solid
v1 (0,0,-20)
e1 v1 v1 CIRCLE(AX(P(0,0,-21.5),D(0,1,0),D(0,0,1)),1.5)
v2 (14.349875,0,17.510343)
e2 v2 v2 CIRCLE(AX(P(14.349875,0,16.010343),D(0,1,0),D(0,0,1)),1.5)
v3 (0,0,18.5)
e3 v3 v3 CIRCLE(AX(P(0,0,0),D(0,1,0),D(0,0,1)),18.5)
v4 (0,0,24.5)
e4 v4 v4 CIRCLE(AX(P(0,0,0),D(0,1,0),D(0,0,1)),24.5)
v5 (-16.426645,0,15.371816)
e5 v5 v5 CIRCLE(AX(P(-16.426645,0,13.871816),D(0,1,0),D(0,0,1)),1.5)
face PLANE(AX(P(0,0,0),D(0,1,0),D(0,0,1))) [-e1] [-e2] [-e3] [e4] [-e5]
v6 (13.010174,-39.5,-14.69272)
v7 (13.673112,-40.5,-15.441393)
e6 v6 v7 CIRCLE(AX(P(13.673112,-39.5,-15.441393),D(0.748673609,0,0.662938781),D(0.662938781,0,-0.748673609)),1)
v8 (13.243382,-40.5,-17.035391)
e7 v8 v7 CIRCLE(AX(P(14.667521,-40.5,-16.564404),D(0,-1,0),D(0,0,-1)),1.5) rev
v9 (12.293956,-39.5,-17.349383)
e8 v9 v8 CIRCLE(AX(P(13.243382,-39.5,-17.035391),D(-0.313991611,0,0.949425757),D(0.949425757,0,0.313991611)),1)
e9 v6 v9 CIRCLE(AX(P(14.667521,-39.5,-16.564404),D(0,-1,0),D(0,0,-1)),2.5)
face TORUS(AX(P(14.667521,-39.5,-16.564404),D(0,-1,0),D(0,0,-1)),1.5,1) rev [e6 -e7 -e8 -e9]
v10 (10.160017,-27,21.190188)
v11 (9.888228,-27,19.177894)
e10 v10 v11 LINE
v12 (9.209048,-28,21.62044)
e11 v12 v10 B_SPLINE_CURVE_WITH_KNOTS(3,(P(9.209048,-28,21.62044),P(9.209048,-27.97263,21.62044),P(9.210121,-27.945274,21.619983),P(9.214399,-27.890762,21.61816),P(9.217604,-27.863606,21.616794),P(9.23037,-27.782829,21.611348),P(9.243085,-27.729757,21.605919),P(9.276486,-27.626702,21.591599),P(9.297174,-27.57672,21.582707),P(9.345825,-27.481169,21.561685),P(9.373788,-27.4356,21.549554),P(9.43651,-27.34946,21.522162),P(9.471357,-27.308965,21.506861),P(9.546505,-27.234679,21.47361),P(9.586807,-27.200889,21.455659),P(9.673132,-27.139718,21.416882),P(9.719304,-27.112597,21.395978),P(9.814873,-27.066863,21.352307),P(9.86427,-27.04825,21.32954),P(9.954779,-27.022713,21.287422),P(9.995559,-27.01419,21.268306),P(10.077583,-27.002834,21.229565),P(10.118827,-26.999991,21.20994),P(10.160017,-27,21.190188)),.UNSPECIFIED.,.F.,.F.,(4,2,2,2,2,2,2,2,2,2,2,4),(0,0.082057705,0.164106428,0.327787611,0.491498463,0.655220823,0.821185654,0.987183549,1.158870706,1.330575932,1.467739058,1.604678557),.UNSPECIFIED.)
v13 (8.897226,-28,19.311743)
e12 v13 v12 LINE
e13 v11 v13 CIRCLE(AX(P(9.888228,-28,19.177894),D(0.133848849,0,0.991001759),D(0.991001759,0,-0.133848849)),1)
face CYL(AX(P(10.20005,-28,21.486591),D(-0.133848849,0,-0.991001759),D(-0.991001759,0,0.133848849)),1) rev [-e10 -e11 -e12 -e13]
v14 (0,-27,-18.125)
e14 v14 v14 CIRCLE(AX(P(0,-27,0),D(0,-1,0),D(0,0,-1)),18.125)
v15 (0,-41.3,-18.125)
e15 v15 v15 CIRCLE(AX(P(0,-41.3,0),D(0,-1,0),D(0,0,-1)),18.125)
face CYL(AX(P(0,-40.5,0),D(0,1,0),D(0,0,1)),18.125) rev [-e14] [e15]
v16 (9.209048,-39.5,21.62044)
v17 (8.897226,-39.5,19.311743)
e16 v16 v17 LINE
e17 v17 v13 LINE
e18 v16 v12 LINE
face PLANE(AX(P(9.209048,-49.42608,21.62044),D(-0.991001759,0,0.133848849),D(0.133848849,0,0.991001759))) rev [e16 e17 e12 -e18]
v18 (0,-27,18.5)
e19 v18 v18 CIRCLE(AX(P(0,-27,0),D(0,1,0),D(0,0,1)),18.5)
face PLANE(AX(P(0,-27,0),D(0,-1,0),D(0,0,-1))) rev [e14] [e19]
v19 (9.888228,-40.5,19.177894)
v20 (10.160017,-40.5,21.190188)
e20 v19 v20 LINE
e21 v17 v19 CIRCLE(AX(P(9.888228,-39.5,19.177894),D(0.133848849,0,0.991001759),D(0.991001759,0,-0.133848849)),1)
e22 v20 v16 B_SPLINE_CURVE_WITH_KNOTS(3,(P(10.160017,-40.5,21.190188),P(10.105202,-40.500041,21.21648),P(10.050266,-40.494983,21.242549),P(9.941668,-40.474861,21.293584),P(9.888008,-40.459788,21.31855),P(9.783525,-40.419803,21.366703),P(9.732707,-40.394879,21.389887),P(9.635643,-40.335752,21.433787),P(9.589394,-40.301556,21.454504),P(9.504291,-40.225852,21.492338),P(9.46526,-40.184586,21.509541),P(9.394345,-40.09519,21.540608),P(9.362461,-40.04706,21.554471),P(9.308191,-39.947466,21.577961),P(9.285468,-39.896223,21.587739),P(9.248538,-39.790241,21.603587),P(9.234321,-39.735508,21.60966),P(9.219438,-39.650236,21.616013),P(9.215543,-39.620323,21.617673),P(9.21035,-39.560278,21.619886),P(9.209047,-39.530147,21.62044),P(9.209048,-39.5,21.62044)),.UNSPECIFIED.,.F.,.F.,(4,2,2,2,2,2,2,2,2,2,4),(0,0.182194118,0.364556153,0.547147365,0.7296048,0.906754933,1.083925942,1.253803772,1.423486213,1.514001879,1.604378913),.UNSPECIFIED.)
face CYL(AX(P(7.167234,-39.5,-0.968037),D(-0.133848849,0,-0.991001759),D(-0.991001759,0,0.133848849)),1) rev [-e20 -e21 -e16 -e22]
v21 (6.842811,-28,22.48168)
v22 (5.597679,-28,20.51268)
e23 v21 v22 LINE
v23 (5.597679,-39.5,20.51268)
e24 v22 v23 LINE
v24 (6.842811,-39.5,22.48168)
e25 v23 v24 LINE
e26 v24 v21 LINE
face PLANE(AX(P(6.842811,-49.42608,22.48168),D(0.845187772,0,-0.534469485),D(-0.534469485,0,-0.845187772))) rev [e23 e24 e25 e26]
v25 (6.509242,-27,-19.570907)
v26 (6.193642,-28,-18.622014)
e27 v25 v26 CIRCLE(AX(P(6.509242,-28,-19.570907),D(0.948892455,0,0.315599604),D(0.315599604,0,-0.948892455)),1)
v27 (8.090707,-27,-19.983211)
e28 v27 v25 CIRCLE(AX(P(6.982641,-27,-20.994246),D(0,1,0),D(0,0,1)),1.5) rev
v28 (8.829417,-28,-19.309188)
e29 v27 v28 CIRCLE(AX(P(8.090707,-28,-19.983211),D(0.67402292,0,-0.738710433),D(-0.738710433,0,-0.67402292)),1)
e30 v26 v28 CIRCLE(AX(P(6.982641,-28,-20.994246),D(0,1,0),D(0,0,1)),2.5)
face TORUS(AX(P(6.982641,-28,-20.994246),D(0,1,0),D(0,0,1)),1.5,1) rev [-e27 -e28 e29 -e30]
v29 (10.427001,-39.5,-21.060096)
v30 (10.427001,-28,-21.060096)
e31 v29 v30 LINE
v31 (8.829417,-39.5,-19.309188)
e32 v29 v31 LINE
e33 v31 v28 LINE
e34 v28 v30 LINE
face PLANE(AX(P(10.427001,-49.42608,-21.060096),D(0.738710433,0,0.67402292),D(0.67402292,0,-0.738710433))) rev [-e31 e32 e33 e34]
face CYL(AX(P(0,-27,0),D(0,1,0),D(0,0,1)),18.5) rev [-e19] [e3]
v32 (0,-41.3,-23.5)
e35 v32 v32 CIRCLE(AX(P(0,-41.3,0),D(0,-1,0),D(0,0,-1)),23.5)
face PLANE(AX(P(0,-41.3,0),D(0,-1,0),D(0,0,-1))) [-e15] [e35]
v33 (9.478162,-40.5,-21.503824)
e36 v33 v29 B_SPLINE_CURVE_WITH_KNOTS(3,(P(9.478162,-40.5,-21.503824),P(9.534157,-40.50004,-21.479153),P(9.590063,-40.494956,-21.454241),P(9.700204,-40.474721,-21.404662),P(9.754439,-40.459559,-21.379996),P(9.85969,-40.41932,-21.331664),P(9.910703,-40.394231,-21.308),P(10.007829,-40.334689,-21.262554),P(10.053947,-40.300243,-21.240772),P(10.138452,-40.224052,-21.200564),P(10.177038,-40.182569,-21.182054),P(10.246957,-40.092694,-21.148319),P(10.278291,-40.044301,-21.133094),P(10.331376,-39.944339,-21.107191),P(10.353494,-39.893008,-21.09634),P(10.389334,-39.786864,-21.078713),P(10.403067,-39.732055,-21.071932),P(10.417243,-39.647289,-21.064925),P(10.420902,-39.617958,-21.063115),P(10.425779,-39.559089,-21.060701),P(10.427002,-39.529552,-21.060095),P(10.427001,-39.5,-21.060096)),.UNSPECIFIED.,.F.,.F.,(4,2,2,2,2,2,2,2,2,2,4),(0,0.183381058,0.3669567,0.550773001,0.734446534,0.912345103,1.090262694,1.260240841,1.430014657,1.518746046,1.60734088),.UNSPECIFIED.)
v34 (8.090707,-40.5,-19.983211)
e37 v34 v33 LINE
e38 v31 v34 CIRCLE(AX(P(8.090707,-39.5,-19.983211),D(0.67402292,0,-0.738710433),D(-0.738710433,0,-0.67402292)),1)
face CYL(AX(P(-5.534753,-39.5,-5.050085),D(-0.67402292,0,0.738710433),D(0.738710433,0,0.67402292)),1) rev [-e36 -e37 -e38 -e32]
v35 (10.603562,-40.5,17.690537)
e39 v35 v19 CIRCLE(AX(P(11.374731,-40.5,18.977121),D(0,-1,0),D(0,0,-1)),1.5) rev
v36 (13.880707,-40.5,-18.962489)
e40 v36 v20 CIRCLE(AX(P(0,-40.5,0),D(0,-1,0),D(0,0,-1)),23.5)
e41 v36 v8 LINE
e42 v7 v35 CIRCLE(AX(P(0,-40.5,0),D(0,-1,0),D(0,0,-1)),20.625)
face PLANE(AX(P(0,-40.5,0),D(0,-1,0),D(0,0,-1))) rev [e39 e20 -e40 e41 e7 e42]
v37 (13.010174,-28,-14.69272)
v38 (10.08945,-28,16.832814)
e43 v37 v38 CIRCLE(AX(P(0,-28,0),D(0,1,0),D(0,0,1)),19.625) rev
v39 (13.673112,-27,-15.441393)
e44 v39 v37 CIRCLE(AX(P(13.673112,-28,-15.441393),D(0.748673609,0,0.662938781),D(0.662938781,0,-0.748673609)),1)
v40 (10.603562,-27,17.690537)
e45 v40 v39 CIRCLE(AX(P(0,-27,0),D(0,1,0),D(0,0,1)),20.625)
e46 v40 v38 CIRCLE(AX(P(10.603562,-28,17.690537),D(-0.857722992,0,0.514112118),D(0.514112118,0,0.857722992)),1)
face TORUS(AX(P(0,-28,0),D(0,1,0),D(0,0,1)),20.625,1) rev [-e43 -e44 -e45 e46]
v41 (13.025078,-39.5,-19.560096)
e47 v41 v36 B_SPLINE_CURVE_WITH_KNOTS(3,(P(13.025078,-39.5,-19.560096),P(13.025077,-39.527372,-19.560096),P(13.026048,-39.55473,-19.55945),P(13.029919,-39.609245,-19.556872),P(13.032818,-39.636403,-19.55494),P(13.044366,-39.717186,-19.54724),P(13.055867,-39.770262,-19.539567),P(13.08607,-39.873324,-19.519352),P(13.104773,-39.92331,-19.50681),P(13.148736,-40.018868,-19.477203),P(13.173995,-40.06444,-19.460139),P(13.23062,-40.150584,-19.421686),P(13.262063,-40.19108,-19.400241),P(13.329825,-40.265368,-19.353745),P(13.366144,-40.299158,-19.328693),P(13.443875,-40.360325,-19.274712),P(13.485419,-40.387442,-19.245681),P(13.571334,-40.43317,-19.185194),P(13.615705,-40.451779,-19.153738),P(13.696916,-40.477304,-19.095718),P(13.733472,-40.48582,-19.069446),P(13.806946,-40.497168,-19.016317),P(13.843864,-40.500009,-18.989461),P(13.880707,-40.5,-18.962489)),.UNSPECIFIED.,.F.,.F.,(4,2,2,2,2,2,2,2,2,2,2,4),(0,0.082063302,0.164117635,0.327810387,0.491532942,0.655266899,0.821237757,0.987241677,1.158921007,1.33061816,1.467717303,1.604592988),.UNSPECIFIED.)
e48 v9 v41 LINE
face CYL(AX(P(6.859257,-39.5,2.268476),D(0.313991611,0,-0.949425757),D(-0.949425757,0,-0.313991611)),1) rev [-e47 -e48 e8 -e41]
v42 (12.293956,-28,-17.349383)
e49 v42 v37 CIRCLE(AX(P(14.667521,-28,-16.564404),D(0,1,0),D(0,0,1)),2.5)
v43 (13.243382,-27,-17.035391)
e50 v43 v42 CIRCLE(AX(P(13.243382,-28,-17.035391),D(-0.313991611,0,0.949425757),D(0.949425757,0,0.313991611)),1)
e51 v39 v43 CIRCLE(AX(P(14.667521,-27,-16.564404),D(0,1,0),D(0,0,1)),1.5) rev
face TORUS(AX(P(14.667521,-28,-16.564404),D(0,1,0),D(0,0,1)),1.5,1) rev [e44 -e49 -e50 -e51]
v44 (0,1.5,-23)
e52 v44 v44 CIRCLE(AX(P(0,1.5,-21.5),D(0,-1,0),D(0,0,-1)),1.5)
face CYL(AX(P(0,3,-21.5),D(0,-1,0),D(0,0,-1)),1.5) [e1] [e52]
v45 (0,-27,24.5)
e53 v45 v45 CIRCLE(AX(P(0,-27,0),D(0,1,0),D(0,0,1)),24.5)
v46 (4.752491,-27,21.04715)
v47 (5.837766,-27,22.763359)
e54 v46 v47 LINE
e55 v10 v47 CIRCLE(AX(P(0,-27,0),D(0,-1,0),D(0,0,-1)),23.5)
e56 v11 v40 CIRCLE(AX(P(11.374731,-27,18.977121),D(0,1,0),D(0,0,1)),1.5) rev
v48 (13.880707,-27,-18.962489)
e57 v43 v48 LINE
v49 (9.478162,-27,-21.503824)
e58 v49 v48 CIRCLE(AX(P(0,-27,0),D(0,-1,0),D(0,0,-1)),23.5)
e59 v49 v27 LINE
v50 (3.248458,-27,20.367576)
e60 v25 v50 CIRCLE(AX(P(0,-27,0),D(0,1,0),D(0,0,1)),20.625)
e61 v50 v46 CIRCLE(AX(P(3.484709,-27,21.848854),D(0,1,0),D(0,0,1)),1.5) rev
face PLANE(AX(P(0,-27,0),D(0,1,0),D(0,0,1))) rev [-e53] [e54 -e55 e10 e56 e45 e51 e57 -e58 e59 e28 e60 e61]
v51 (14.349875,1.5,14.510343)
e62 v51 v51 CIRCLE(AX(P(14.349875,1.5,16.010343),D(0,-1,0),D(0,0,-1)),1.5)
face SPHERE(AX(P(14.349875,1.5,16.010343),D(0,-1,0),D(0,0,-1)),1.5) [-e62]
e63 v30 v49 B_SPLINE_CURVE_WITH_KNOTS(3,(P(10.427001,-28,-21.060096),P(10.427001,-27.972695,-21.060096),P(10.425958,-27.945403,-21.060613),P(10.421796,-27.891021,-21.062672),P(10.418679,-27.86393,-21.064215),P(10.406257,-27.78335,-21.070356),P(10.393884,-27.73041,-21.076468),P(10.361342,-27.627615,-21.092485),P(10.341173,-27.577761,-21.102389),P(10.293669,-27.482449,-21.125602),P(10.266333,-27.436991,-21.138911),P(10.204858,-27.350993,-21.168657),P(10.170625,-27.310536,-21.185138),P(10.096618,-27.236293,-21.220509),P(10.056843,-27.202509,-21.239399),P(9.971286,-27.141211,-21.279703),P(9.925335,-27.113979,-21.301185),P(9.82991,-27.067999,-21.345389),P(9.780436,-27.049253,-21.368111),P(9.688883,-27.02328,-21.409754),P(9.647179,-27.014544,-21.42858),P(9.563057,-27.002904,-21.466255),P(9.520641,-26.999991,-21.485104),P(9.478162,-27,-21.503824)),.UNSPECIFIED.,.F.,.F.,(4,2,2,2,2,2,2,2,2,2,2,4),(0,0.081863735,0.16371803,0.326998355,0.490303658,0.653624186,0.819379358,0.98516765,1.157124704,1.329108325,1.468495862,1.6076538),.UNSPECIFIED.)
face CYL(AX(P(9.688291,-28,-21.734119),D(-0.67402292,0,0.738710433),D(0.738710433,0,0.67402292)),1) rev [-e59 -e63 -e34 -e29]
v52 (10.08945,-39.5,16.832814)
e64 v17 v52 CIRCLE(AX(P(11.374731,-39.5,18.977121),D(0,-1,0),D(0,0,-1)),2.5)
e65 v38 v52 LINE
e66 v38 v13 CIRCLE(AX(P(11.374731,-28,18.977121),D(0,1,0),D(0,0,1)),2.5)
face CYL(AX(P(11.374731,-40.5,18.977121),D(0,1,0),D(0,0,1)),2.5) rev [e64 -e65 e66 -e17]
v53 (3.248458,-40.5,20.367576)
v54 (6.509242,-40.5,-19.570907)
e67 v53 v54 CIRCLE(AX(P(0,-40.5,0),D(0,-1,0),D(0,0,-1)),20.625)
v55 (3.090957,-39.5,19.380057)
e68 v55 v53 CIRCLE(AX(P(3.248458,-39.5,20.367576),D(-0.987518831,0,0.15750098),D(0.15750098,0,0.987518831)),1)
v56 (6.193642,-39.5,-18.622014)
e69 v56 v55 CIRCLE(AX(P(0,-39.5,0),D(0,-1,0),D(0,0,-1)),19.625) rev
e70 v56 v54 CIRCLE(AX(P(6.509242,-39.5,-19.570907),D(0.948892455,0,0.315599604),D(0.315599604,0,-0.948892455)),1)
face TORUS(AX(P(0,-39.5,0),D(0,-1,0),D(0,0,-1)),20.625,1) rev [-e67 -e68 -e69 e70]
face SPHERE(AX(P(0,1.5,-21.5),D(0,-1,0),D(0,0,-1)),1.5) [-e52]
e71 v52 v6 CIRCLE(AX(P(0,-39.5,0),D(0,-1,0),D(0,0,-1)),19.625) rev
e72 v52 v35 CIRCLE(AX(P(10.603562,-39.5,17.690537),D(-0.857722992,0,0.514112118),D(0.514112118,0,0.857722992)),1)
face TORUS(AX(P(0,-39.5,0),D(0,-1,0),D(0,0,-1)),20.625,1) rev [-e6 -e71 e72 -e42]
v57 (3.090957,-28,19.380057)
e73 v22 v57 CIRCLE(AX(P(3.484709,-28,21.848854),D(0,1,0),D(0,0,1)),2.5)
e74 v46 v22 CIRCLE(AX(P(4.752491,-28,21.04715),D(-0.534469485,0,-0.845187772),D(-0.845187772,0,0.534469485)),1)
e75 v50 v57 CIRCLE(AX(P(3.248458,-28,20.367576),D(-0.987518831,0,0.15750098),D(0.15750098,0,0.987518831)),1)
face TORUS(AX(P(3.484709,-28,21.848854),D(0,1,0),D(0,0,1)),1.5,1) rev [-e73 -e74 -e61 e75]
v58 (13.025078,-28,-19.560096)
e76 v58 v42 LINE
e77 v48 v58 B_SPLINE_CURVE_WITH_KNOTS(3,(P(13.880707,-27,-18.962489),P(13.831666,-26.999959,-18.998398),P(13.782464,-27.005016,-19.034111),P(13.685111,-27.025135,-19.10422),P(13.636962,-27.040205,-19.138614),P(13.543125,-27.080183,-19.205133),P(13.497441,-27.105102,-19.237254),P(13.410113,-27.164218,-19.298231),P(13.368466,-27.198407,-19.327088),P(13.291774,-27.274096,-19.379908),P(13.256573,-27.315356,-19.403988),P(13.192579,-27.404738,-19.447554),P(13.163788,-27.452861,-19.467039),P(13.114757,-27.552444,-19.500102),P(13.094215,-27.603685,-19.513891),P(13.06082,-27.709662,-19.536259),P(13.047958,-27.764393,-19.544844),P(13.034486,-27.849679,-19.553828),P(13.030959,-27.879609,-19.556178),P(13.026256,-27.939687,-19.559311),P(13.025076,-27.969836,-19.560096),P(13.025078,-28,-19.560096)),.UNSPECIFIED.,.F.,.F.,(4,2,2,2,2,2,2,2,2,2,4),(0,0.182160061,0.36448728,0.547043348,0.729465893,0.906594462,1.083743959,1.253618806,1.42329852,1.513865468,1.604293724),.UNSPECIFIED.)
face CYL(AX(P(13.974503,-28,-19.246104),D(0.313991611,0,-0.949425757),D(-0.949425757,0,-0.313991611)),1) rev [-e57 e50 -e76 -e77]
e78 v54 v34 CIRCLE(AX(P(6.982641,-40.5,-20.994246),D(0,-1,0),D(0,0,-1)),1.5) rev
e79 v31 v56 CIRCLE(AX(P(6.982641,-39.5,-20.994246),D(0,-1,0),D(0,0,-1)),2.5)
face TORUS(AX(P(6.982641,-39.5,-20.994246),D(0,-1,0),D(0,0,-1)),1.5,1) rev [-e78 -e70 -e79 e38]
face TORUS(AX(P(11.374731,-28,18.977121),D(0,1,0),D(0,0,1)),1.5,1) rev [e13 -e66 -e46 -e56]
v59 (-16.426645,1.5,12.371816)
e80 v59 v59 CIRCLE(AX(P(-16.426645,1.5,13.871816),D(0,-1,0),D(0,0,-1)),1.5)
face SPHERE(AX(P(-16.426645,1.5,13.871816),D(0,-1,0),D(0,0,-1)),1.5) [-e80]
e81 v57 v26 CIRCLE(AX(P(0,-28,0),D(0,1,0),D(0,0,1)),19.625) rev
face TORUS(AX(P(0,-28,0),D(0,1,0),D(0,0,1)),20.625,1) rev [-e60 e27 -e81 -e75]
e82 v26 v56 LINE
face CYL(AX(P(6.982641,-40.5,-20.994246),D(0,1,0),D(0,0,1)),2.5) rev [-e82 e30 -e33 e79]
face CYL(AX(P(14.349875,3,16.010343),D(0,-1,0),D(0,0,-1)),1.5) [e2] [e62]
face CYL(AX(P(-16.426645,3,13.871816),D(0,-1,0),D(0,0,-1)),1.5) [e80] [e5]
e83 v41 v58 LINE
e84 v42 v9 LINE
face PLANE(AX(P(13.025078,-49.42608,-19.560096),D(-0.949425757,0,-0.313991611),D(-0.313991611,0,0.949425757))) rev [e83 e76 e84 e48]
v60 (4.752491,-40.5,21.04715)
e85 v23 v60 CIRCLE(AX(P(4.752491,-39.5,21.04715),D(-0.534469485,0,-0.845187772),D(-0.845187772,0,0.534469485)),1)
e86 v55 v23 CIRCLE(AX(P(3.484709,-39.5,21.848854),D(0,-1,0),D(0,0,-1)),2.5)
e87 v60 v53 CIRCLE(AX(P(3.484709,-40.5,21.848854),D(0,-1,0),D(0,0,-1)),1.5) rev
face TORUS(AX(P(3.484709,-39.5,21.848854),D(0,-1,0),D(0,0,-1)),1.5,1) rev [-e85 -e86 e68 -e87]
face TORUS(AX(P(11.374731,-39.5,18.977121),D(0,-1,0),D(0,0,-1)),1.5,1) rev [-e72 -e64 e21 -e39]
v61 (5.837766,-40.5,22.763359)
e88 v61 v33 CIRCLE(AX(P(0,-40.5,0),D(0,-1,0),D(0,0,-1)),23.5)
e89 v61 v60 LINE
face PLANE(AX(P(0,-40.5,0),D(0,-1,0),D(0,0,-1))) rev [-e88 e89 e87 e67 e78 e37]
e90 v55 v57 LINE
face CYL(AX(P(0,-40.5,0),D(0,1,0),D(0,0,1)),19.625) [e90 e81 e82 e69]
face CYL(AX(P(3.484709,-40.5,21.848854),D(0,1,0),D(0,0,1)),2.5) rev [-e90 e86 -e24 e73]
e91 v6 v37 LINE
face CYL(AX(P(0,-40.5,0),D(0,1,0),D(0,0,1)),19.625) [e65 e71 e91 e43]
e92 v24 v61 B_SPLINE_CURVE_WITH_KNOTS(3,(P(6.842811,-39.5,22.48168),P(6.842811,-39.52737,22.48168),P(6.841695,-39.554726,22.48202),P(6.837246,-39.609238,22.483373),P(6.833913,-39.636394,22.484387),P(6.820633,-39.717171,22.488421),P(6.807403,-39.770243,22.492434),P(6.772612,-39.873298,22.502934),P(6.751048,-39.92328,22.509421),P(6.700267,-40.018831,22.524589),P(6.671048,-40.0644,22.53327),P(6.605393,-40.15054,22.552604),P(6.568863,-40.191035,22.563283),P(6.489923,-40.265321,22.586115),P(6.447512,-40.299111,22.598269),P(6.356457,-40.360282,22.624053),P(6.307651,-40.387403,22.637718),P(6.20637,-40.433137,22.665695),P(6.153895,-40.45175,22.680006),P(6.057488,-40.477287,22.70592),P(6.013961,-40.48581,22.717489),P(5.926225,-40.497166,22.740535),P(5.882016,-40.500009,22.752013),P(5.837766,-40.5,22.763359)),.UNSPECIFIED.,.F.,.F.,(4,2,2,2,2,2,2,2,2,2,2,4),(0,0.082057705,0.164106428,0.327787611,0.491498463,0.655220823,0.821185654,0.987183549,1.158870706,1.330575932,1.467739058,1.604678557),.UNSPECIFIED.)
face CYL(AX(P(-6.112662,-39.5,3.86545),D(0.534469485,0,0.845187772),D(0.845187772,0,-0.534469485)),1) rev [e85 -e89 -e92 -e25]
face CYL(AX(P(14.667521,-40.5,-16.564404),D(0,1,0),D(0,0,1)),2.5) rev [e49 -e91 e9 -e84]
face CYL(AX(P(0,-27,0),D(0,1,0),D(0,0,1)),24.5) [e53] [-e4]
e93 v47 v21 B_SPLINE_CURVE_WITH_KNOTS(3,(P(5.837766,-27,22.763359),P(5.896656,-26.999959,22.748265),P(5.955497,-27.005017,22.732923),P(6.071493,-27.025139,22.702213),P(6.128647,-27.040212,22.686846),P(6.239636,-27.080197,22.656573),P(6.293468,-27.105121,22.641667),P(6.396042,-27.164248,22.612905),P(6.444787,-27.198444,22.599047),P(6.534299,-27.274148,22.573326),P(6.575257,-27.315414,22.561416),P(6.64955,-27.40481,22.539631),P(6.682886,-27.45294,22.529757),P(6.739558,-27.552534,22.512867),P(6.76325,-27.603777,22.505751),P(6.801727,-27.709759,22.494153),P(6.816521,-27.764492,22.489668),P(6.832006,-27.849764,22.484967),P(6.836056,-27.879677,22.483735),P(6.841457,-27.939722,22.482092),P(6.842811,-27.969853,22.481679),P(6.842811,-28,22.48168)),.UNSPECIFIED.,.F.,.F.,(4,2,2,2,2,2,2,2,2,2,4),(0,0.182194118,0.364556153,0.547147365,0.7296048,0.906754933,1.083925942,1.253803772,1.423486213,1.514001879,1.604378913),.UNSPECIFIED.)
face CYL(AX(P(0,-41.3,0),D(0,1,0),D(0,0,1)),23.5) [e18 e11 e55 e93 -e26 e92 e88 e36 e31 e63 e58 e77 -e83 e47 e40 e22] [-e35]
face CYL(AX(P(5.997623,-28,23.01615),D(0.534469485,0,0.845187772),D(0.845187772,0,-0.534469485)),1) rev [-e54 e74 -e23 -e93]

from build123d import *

# Parameters (mm, degrees)
SKETCH1_R            = 24.5
SKETCH1_R_2          = 18.5
BOSS_EXTRUDE1_DEPTH  = 27
SKETCH2_R            = 19.625
SKETCH2_R_2          = 18.125
BOSS_EXTRUDE2_DEPTH  = 13.5
SKETCH4_R            = 23.5
SKETCH4_R_2          = 18.125
BOSS_EXTRUDE3_DEPTH  = 0.8
SKETCH3_R            = 1.5
BOSS_EXTRUDE4_DEPTH  = 3
FILLET1_R            = 1.5
BOSS_EXTRUDE14_DEPTH = 13.5
FILLET3_R            = 2.5
FILLET4_R            = 1


with BuildPart() as part:
    # Sketch1 → Boss-Extrude1 (new body)
    with BuildSketch(Plane(origin=(0, 0, 0), x_dir=(1, 0, 0), z_dir=(0, 1, 0))):
        with Locations(Location((0, 0, 0), (0, 0, 270))):
            Circle(SKETCH1_R)
        with Locations(Location((0, 0, 0), (0, 0, 270))):
            Circle(SKETCH1_R_2, mode=Mode.SUBTRACT)
    extrude(amount=-BOSS_EXTRUDE1_DEPTH)

    # Sketch2 → Boss-Extrude2 (add)
    with BuildSketch(Plane.XZ.offset(27)):
        with Locations(Location((0, 0, 0), (0, 0, 90))):
            Circle(SKETCH2_R)
        with Locations(Location((0, 0, 0), (0, 0, 270))):
            Circle(SKETCH2_R_2, mode=Mode.SUBTRACT)
    extrude(amount=BOSS_EXTRUDE2_DEPTH)

    # Sketch4 → Boss-Extrude3 (add)
    with BuildSketch(Plane.XZ.offset(40.5)):
        with Locations(Location((0, 0, 0), (0, 0, 270))):
            Circle(SKETCH4_R)
        with Locations(Location((0, 0, 0), (0, 0, 270))):
            Circle(SKETCH4_R_2, mode=Mode.SUBTRACT)
    extrude(amount=BOSS_EXTRUDE3_DEPTH)

    # Sketch3 → Boss-Extrude4 (add)
    with BuildSketch(Plane(origin=(0, 0, 0), x_dir=(1, 0, 0), z_dir=(0, 1, 0))):
        with Locations(Location((0, 21.5, 0), (0, 0, 270))):
            Circle(SKETCH3_R)
        with Locations(Location((-16.426644714, -13.871815665, 0), (0, 0, 270))):
            Circle(SKETCH3_R)
        with Locations(Location((14.349874969, -16.010343168, 0), (0, 0, 270))):
            Circle(SKETCH3_R)
    extrude(amount=BOSS_EXTRUDE4_DEPTH)

    # Fillet1
    fillet1_edges = [part.edges().sort_by_distance(p)[0] for p in [
        (0, 3, -23),
        (-16.426644714, 3, 12.371815665),
        (14.349874969, 3, 14.510343168),
    ]]
    fillet(fillet1_edges, radius=FILLET1_R)

    # Sketch6 → Boss-Extrude14 (add)
    with BuildSketch(Plane.XZ.offset(27)):
        with BuildLine():
            Line((10.427001294, -21.060096012), (6.880284611, -17.172992857))
            ThreePointArc((6.880284611, -17.172992857), (9.221324303, -16.03799171), (11.379993428, -14.585806443))
            Line((11.379993428, -14.585806443), (13.025077505, -19.560096012))
            ThreePointArc((13.025077505, -19.560096012), (11.75, -20.351596989), (10.427001294, -21.060096012))
        make_face()
        with BuildLine():
            Line((9.20904846, 21.620440015), (8.507694451, 16.427694151))
            ThreePointArc((8.507694451, 16.427694151), (6.327372652, 17.384313485), (4.042246199, 18.052984398))
            Line((4.042246199, 18.052984398), (6.842810559, 22.481680179))
            ThreePointArc((6.842810559, 22.481680179), (8.037473368, 22.082776588), (9.20904846, 21.620440015))
        make_face()
    extrude(amount=BOSS_EXTRUDE14_DEPTH)

    # Fillet3
    fillet3_edges = [part.edges().sort_by_distance(p)[0] for p in [
        (8.667040078, -33.75, 17.607471178),
        (4.678526421, -33.75, 19.059171428),
        (11.753741984, -33.75, -15.715921048),
        (7.686830622, -33.75, -18.056944924),
    ]]
    fillet(fillet3_edges, radius=FILLET3_R)

    # Fillet4
    # the kernel refuses this fillet: 1 mm, written as the material it adds along each edge
    with BuildSketch(Plane(origin=(5.597678623, -27, 20.512680419), x_dir=(-0.845187772005224, 0, 0.5344694846788222), z_dir=(0.5344694846788222, 0, 0.845187772005224))) as fillet4_piece_1_section:
        with BuildLine():
            CenterArc((FILLET4_R, FILLET4_R), FILLET4_R, 180, 90)
            Line((0, FILLET4_R), (0, 0))
            Line((0, 0), (FILLET4_R, 0))
        make_face()
    fillet4_piece_1 = extrude(amount=4.829659544, mode=Mode.PRIVATE)
    fillet4_piece_1 = fillet4_piece_1 & Plane(origin=(0, -27.229900113, 0), x_dir=(0.29118342802716585, 0, 0.9566672416479768), z_dir=(0, 1, 0)) * Cylinder(23.5, 14, mode=Mode.PRIVATE)
    add(fillet4_piece_1)
    with BuildSketch(Plane(origin=(5.597678623, -40.5, 20.512680419), x_dir=(0, 1, 0), z_dir=(0.5344694846788222, 0, 0.845187772005224))) as fillet4_piece_2_section:
        with BuildLine():
            CenterArc((FILLET4_R, FILLET4_R), FILLET4_R, 180, 90)
            Line((0, FILLET4_R), (0, 0))
            Line((0, 0), (FILLET4_R, 0))
        make_face()
    fillet4_piece_2 = extrude(amount=4.829659544, mode=Mode.PRIVATE)
    fillet4_piece_2 = fillet4_piece_2 & Plane(origin=(0, -40.270099952, 0), x_dir=(0.29118342802716585, 0, 0.9566672416479768), z_dir=(0, 1, 0)) * Cylinder(23.5, 14, mode=Mode.PRIVATE)
    add(fillet4_piece_2)
    with BuildSketch(Plane(origin=(12.293956137, -27, -17.349382624), x_dir=(0.9494257570669186, 0, 0.31399161106295287), z_dir=(0.31399161106295287, 0, -0.9494257570669186))) as fillet4_piece_3_section:
        with BuildLine():
            CenterArc((FILLET4_R, FILLET4_R), FILLET4_R, 180, 90)
            Line((0, FILLET4_R), (0, 0))
            Line((0, 0), (FILLET4_R, 0))
        make_face()
    fillet4_piece_3 = extrude(amount=4.828474208, mode=Mode.PRIVATE)
    fillet4_piece_3 = fillet4_piece_3 & Plane(origin=(0, -27.229897282, 0), x_dir=(0.554258617244049, 0, -0.8323445111314876), z_dir=(0, 1, 0)) * Cylinder(23.5, 14, mode=Mode.PRIVATE)
    add(fillet4_piece_3)
    with BuildSketch(Plane(origin=(12.293956137, -40.5, -17.349382624), x_dir=(0, 1, 0), z_dir=(0.31399161106295287, 0, -0.9494257570669186))) as fillet4_piece_4_section:
        with BuildLine():
            CenterArc((FILLET4_R, FILLET4_R), FILLET4_R, 180, 90)
            Line((0, FILLET4_R), (0, 0))
            Line((0, 0), (FILLET4_R, 0))
        make_face()
    fillet4_piece_4 = extrude(amount=4.828474208, mode=Mode.PRIVATE)
    fillet4_piece_4 = fillet4_piece_4 & Plane(origin=(0, -40.270102709, 0), x_dir=(0.554258617244049, 0, -0.8323445111314876), z_dir=(0, 1, 0)) * Cylinder(23.5, 14, mode=Mode.PRIVATE)
    add(fillet4_piece_4)
    with BuildSketch(Plane(origin=(12.112058593, -40.5, -22.906872094), x_dir=(0, 1, 0), z_dir=(-0.6740229195535309, 0, 0.7387104330632771))) as fillet4_piece_5_section:
        with BuildLine():
            CenterArc((FILLET4_R, FILLET4_R), FILLET4_R, 180, 90)
            Line((0, FILLET4_R), (0, 0))
            Line((0, 0), (FILLET4_R, 0))
        make_face()
    fillet4_piece_5 = extrude(amount=4.870222046, mode=Mode.PRIVATE)
    fillet4_piece_5 = fillet4_piece_5 & Plane(origin=(0, -40.270007691, 0), x_dir=(0.554258617244049, 0, -0.8323445111314876), z_dir=(0, 1, 0)) * Cylinder(23.5, 14, mode=Mode.PRIVATE)
    add(fillet4_piece_5)
    with BuildSketch(Plane(origin=(12.112058593, -27, -22.906872094), x_dir=(-0.7387104330632771, 0, -0.6740229195535309), z_dir=(-0.6740229195535309, 0, 0.7387104330632771))) as fillet4_piece_6_section:
        with BuildLine():
            CenterArc((FILLET4_R, FILLET4_R), FILLET4_R, 180, 90)
            Line((0, FILLET4_R), (0, 0))
            Line((0, 0), (FILLET4_R, 0))
        make_face()
    fillet4_piece_6 = extrude(amount=4.870222046, mode=Mode.PRIVATE)
    fillet4_piece_6 = fillet4_piece_6 & Plane(origin=(0, -27.229992277, 0), x_dir=(0.554258617244049, 0, -0.8323445111314876), z_dir=(0, 1, 0)) * Cylinder(23.5, 14, mode=Mode.PRIVATE)
    add(fillet4_piece_6)
    with BuildSketch(Plane(origin=(0, -27, 0), x_dir=(0.31559960351651706, 0, -0.9488924545280235), z_dir=(0.9488924545280235, 0, 0.31559960351651706))) as fillet4_piece_7:
        with BuildLine():
            CenterArc((19.625 + FILLET4_R, -FILLET4_R), FILLET4_R, 90, 90)
            Line((19.625, -FILLET4_R), (19.625, 0))
            Line((19.625, 0), (19.625 + FILLET4_R, 0))
        make_face()
    revolve(axis=Axis((0, -27, 0), (0, 1, 0)), revolution_arc=207.458888938)
    with BuildSketch(Plane(origin=(9.543670582, -27, 24.097944412), x_dir=(0.9910017586438099, 0, -0.133848848948641), z_dir=(-0.133848848948641, 0, -0.9910017586438098))) as fillet4_piece_8_section:
        with BuildLine():
            CenterArc((FILLET4_R, FILLET4_R), FILLET4_R, 180, 90)
            Line((0, FILLET4_R), (0, 0))
            Line((0, 0), (FILLET4_R, 0))
        make_face()
    fillet4_piece_8 = extrude(amount=4.829659544, mode=Mode.PRIVATE)
    fillet4_piece_8 = fillet4_piece_8 & Plane(origin=(0, -27.229900043, 0), x_dir=(0.29118342802716585, 0, 0.9566672416479768), z_dir=(0, 1, 0)) * Cylinder(23.5, 14, mode=Mode.PRIVATE)
    add(fillet4_piece_8)
    with BuildSketch(Plane(origin=(0, -27, 0), x_dir=(0.6629387810190173, 0, -0.7486736088717295), z_dir=(-0.7486736088717295, 0, -0.6629387810190173))) as fillet4_piece_9:
        with BuildLine():
            CenterArc((19.625 + FILLET4_R, FILLET4_R), FILLET4_R, 180, 90)
            Line((19.625, FILLET4_R), (19.625, 0))
            Line((19.625, 0), (19.625 + FILLET4_R, 0))
        make_face()
    revolve(axis=Axis((0, -27, 0), (0, -1, 0)), revolution_arc=107.537485904)
    with BuildSketch(Plane(origin=(3.484709193, -27, 21.848854131), x_dir=(-0.15750098046494554, 0, -0.9875188307837884), z_dir=(-0.9875188307837884, 0, 0.15750098046494554))) as fillet4_piece_10:
        with BuildLine():
            CenterArc((2.5 - FILLET4_R, FILLET4_R), FILLET4_R, 270, 90)
            Line((2.5, FILLET4_R), (2.5, 0))
            Line((2.5, 0), (2.5 - FILLET4_R, 0))
        make_face()
    revolve(axis=Axis((3.484709193, -27, 21.848854131), (0, -1, 0)), revolution_arc=66.753933518)
    with BuildSketch(Plane(origin=(11.374730608, -27, 18.977121188), x_dir=(-0.514112117888976, 0, -0.8577229915536319), z_dir=(0.8577229915536319, 0, -0.514112117888976))) as fillet4_piece_11:
        with BuildLine():
            CenterArc((2.5 - FILLET4_R, -FILLET4_R), FILLET4_R, 0, 90)
            Line((2.5, -FILLET4_R), (2.5, 0))
            Line((2.5, 0), (2.5 - FILLET4_R, 0))
        make_face()
    revolve(axis=Axis((11.374730608, -27, 18.977121188), (0, 1, 0)), revolution_arc=66.753933518)
    with BuildSketch(Plane(origin=(14.66752053, -27, -16.564403596), x_dir=(-0.6629387810190174, 0, 0.7486736088717294), z_dir=(0.7486736088717294, 0, 0.6629387810190174))) as fillet4_piece_12:
        with BuildLine():
            CenterArc((2.5 - FILLET4_R, FILLET4_R), FILLET4_R, 270, 90)
            Line((2.5, FILLET4_R), (2.5, 0))
            Line((2.5, 0), (2.5 - FILLET4_R, 0))
        make_face()
    revolve(axis=Axis((14.66752053, -27, -16.564403596), (0, -1, 0)), revolution_arc=66.775561076)
    with BuildSketch(Plane(origin=(6.982641228, -27, -20.994245556), x_dir=(0.7387104330632772, 0, 0.6740229195535309), z_dir=(0.6740229195535309, 0, -0.7387104330632772))) as fillet4_piece_13:
        with BuildLine():
            CenterArc((2.5 - FILLET4_R, FILLET4_R), FILLET4_R, 270, 90)
            Line((2.5, FILLET4_R), (2.5, 0))
            Line((2.5, 0), (2.5 - FILLET4_R, 0))
        make_face()
    revolve(axis=Axis((6.982641228, -27, -20.994245556), (0, -1, 0)), revolution_arc=66.01869491)
    with BuildSketch(Plane(origin=(0, -40.5, 0), x_dir=(0.31559960351651706, 0, -0.9488924545280235), z_dir=(0.9488924545280235, 0, 0.31559960351651706))) as fillet4_piece_14:
        with BuildLine():
            CenterArc((19.625 + FILLET4_R, FILLET4_R), FILLET4_R, 180, 90)
            Line((19.625 + FILLET4_R, 0), (19.625, 0))
            Line((19.625, 0), (19.625, FILLET4_R))
        make_face()
    revolve(axis=Axis((0, -40.5, 0), (0, 1, 0)), revolution_arc=207.458888938)
    with BuildSketch(Plane(origin=(3.484709193, -40.5, 21.848854131), x_dir=(-0.15750098046494554, 0, -0.9875188307837884), z_dir=(-0.9875188307837884, 0, 0.15750098046494554))) as fillet4_piece_15:
        with BuildLine():
            CenterArc((2.5 - FILLET4_R, -FILLET4_R), FILLET4_R, 0, 90)
            Line((2.5 - FILLET4_R, 0), (2.5, 0))
            Line((2.5, 0), (2.5, -FILLET4_R))
        make_face()
    revolve(axis=Axis((3.484709193, -40.5, 21.848854131), (0, -1, 0)), revolution_arc=66.753933518)
    with BuildSketch(Plane(origin=(6.982641228, -40.5, -20.994245556), x_dir=(0.7387104330632772, 0, 0.6740229195535309), z_dir=(0.6740229195535309, 0, -0.7387104330632772))) as fillet4_piece_16:
        with BuildLine():
            CenterArc((2.5 - FILLET4_R, -FILLET4_R), FILLET4_R, 0, 90)
            Line((2.5 - FILLET4_R, 0), (2.5, 0))
            Line((2.5, 0), (2.5, -FILLET4_R))
        make_face()
    revolve(axis=Axis((6.982641228, -40.5, -20.994245556), (0, -1, 0)), revolution_arc=66.01869491)
    with BuildSketch(Plane(origin=(0, -40.5, 0), x_dir=(0.6629387810190173, 0, -0.7486736088717295), z_dir=(-0.7486736088717295, 0, -0.6629387810190173))) as fillet4_piece_17:
        with BuildLine():
            CenterArc((19.625 + FILLET4_R, -FILLET4_R), FILLET4_R, 90, 90)
            Line((19.625 + FILLET4_R, 0), (19.625, 0))
            Line((19.625, 0), (19.625, -FILLET4_R))
        make_face()
    revolve(axis=Axis((0, -40.5, 0), (0, -1, 0)), revolution_arc=107.537485904)
    with BuildSketch(Plane(origin=(9.543670582, -40.5, 24.097944412), x_dir=(0, 1, 0), z_dir=(-0.133848848948641, 0, -0.9910017586438098))) as fillet4_piece_18_section:
        with BuildLine():
            CenterArc((FILLET4_R, FILLET4_R), FILLET4_R, 180, 90)
            Line((0, FILLET4_R), (0, 0))
            Line((0, 0), (FILLET4_R, 0))
        make_face()
    fillet4_piece_18 = extrude(amount=4.829659544, mode=Mode.PRIVATE)
    fillet4_piece_18 = fillet4_piece_18 & Plane(origin=(0, -40.270099922, 0), x_dir=(0.29118342802716585, 0, 0.9566672416479768), z_dir=(0, 1, 0)) * Cylinder(23.5, 14, mode=Mode.PRIVATE)
    add(fillet4_piece_18)
    with BuildSketch(Plane(origin=(11.374730608, -40.5, 18.977121188), x_dir=(-0.514112117888976, 0, -0.8577229915536319), z_dir=(0.8577229915536319, 0, -0.514112117888976))) as fillet4_piece_19:
        with BuildLine():
            CenterArc((2.5 - FILLET4_R, FILLET4_R), FILLET4_R, 270, 90)
            Line((2.5 - FILLET4_R, 0), (2.5, 0))
            Line((2.5, 0), (2.5, FILLET4_R))
        make_face()
    revolve(axis=Axis((11.374730608, -40.5, 18.977121188), (0, 1, 0)), revolution_arc=66.753933518)
    with BuildSketch(Plane(origin=(14.66752053, -40.5, -16.564403596), x_dir=(-0.6629387810190174, 0, 0.7486736088717294), z_dir=(0.7486736088717294, 0, 0.6629387810190174))) as fillet4_piece_20:
        with BuildLine():
            CenterArc((2.5 - FILLET4_R, -FILLET4_R), FILLET4_R, 0, 90)
            Line((2.5 - FILLET4_R, 0), (2.5, 0))
            Line((2.5, 0), (2.5, -FILLET4_R))
        make_face()
    revolve(axis=Axis((14.66752053, -40.5, -16.564403596), (0, -1, 0)), revolution_arc=66.775561076)


solid = part.part
